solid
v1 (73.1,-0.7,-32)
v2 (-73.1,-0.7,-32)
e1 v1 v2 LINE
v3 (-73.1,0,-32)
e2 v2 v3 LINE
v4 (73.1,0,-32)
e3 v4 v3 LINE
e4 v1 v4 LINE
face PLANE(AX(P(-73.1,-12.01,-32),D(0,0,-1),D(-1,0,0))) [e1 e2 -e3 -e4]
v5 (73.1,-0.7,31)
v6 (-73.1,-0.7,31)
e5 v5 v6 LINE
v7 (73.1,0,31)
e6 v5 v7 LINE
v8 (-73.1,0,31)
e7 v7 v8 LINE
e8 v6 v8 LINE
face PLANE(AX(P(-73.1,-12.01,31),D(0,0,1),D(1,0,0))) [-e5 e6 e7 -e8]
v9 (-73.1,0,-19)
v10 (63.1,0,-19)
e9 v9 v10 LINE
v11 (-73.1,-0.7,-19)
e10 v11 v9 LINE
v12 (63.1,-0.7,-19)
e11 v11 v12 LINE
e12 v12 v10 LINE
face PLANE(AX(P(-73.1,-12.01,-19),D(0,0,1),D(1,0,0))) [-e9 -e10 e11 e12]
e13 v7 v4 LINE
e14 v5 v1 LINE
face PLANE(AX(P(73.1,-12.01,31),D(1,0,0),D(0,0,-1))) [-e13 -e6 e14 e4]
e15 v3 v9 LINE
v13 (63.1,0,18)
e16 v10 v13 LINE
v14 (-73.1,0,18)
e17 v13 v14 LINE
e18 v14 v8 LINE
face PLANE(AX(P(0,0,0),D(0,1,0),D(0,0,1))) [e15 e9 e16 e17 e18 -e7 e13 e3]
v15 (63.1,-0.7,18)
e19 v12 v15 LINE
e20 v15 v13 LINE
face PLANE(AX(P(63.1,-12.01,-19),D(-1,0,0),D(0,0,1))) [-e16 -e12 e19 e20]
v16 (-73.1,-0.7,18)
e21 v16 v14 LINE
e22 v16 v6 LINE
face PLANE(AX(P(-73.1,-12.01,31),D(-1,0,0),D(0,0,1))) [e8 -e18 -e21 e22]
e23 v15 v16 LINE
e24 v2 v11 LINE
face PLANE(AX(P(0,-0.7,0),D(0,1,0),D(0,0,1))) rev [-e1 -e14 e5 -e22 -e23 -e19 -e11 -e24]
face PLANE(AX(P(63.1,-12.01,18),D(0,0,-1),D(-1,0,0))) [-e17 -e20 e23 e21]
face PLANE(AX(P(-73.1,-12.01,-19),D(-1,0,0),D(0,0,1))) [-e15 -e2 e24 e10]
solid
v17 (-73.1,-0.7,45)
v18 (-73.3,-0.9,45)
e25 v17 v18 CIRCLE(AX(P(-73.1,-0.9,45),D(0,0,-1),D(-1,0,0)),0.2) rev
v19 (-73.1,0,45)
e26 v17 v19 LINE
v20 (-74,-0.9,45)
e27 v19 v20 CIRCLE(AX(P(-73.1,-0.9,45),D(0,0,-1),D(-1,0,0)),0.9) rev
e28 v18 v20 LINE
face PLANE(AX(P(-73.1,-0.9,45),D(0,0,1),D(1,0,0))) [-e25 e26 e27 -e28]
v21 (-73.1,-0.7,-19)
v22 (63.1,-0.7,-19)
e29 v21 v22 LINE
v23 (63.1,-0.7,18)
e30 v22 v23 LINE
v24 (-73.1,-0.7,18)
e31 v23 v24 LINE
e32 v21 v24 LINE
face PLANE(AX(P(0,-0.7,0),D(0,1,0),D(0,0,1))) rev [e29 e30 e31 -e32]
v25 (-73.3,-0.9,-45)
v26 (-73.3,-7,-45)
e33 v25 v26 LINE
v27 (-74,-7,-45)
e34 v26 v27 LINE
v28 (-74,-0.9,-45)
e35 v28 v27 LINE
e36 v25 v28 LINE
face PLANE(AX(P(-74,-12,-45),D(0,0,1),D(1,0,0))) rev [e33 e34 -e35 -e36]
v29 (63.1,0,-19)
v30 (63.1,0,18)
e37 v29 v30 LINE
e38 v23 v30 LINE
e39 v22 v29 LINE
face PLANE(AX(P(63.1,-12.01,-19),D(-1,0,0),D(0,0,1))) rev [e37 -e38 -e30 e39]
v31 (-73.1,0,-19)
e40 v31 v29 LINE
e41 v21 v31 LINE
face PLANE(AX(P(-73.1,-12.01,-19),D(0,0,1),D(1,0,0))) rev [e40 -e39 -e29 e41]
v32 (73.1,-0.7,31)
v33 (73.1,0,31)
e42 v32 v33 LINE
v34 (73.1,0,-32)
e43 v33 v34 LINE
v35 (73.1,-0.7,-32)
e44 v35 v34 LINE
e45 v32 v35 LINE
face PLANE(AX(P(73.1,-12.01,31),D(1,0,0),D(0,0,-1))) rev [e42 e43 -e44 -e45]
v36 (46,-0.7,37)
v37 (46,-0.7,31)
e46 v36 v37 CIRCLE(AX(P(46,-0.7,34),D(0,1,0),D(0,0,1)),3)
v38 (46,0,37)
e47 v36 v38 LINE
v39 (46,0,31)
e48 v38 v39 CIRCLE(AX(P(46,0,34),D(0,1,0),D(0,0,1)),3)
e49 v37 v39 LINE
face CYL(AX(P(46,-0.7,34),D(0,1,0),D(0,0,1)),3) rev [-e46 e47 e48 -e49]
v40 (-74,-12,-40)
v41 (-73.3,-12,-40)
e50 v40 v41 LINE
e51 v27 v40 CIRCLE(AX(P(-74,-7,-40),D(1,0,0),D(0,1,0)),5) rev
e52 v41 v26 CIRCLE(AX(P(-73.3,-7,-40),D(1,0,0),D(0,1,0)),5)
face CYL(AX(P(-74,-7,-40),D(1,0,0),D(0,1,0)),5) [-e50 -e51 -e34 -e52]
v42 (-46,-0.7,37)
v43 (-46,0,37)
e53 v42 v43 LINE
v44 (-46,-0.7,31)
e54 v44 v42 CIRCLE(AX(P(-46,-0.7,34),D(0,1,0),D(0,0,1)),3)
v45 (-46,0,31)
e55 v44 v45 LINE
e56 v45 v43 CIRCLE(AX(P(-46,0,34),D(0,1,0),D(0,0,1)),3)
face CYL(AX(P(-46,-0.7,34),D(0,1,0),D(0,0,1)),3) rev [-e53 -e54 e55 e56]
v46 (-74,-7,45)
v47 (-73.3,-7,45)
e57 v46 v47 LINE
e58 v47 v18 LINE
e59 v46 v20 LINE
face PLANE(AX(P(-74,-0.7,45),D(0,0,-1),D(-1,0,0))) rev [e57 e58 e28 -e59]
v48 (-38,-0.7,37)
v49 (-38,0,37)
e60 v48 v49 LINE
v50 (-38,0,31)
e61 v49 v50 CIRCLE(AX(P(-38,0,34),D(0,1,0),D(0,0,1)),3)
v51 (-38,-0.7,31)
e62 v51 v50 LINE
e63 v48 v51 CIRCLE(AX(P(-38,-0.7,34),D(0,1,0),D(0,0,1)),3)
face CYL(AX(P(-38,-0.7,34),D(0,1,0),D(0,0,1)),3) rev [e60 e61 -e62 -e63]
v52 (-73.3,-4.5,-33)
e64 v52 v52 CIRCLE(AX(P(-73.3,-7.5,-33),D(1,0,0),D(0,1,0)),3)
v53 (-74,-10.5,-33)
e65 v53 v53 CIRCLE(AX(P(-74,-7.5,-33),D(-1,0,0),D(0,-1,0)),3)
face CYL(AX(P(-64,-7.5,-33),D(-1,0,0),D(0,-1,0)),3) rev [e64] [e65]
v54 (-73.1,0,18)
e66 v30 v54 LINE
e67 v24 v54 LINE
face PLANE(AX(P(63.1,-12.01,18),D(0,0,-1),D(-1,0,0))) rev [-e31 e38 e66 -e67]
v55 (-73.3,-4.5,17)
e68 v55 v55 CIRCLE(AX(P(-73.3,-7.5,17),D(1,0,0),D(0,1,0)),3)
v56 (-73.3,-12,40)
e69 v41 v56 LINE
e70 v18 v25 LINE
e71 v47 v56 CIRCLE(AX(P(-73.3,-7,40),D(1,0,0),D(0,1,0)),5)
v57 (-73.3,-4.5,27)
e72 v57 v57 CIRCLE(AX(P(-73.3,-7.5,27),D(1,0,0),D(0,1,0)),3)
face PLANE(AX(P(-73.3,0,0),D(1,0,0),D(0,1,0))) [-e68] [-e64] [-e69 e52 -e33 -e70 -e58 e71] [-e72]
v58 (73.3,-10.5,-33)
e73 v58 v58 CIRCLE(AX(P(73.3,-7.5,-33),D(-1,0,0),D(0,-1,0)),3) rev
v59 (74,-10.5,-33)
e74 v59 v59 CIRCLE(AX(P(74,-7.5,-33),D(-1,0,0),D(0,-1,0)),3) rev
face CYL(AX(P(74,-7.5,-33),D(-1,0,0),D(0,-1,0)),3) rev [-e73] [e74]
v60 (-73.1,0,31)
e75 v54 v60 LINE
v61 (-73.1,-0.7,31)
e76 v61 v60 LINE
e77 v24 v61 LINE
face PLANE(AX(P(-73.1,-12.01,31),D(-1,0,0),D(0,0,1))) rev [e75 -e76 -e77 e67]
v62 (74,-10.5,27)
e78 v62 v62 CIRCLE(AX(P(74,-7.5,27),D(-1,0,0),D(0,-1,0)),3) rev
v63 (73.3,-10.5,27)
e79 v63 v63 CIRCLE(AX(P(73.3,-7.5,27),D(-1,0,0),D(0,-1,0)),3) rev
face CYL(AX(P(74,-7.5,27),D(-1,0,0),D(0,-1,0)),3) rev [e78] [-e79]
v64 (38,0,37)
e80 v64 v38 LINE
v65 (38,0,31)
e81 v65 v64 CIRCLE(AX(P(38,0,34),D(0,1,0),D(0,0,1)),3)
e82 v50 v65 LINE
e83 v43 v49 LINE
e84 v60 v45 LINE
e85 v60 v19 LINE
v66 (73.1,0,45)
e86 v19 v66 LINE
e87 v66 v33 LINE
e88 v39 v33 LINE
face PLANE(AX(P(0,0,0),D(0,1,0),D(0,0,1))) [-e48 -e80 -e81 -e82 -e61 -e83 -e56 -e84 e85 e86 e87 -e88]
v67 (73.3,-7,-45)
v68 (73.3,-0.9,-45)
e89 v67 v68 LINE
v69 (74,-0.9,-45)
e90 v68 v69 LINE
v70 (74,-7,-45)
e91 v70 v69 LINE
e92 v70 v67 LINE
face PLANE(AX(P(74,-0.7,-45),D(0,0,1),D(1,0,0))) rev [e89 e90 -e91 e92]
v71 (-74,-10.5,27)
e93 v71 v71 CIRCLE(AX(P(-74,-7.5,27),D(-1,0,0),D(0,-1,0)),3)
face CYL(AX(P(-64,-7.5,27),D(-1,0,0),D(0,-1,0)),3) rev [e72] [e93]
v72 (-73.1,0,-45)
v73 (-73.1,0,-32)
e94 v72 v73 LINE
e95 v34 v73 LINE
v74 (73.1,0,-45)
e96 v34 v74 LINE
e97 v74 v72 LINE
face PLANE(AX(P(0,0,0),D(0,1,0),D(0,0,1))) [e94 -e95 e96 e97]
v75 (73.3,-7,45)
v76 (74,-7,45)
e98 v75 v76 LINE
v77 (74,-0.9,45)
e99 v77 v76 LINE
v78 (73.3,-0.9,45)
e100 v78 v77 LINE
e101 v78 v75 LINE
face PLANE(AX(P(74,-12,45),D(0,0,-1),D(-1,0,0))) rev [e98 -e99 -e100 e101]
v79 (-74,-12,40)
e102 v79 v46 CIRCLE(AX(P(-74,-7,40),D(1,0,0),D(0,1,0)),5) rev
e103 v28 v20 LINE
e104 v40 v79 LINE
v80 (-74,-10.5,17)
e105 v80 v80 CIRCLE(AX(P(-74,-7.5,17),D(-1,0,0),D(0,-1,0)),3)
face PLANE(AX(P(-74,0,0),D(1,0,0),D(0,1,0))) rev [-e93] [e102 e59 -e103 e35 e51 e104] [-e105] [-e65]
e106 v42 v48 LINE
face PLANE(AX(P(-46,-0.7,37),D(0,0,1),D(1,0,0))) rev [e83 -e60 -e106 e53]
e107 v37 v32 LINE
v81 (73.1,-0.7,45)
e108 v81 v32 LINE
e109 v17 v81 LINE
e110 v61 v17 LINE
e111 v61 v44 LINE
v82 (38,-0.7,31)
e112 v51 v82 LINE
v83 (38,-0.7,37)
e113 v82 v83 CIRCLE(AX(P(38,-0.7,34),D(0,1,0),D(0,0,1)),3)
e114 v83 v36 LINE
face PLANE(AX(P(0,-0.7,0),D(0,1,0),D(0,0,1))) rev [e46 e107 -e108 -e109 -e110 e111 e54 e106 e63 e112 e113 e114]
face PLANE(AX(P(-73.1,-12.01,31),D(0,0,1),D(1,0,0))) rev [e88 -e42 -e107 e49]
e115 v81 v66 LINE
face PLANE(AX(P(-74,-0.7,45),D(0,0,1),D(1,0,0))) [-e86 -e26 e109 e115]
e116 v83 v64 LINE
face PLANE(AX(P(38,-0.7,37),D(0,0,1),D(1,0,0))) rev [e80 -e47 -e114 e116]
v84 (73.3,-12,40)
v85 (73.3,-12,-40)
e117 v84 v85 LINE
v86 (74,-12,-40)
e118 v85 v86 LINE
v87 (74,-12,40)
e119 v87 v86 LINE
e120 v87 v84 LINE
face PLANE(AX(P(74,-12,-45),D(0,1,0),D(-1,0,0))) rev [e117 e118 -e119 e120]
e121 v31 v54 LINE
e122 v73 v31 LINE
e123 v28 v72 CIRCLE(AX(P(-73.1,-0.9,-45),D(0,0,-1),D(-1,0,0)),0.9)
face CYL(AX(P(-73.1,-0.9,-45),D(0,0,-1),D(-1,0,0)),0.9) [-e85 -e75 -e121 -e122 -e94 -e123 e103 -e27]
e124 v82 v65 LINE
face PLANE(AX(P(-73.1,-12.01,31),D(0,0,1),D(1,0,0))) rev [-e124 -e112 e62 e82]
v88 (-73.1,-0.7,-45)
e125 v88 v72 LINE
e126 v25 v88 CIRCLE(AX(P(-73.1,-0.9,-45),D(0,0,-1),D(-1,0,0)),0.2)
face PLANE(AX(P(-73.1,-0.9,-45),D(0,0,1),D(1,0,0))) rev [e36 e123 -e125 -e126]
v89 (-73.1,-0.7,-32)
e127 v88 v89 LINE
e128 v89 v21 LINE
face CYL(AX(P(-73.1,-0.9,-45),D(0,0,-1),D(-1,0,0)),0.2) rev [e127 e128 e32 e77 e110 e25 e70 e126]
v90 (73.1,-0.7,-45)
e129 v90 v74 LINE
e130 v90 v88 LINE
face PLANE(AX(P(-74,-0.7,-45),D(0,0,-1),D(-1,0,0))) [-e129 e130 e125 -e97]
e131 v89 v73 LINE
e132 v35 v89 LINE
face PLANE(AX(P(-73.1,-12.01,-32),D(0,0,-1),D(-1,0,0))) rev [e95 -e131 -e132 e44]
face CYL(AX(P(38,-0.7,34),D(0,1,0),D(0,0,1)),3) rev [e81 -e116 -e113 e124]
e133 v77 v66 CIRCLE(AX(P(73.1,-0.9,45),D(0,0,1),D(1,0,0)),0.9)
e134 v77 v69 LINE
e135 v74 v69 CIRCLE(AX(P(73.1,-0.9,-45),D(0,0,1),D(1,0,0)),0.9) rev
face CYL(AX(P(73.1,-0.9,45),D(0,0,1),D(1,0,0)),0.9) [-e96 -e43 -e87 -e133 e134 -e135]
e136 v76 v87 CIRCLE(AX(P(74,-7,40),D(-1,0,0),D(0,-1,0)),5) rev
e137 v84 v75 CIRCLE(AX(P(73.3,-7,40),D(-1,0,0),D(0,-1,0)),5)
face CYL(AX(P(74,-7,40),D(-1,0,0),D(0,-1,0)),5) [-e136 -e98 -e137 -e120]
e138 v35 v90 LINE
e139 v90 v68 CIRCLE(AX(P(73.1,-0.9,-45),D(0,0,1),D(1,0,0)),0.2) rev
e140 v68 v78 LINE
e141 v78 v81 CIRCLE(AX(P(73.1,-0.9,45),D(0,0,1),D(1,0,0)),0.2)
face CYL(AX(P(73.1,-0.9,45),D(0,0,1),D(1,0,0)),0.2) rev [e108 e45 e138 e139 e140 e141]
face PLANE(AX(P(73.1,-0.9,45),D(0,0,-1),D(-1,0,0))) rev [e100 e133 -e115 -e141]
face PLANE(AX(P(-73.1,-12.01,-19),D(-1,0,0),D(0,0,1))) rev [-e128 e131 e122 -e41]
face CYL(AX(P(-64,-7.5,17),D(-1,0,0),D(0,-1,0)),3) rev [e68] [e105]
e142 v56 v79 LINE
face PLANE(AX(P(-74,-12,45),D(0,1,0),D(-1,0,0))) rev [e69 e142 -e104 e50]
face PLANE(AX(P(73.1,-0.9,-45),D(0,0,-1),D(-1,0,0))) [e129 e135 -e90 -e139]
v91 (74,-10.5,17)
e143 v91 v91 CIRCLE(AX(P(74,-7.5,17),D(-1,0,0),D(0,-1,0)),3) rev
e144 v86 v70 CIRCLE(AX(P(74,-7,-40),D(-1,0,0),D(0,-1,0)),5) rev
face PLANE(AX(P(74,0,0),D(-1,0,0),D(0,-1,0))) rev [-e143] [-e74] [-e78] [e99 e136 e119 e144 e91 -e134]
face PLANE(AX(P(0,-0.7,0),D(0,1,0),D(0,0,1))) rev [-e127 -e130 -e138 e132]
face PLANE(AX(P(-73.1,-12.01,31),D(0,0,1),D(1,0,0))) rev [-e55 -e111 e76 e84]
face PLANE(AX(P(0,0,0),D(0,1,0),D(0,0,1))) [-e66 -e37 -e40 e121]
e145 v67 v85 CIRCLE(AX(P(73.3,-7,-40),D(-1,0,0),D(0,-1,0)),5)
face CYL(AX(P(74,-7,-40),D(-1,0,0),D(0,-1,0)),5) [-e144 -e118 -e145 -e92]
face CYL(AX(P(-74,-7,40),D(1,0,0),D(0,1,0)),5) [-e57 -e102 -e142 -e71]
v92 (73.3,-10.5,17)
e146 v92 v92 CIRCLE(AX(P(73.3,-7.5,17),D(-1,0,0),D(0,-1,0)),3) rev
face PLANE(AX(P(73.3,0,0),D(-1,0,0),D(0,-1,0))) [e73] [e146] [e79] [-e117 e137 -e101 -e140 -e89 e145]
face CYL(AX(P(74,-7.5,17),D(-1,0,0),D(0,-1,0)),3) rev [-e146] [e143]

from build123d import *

# Parameters (mm, degrees)
SKETCH_1_W                         = 148
SKETCH_1_H                         = 90
SM_BASE_FLANGE_1_DEPTH             = 0.7
SM_EDGE_FLANGE_1_STRIP_W           = 3.2
SM_EDGE_FLANGE_1_STRIP_H           = 0.7
SM_EDGE_FLANGE_1_STRIP_CUT_DEPTH   = 90
SM_EDGE_FLANGE_1_STRIP_2_W         = 3.2
SM_EDGE_FLANGE_1_STRIP_2_H         = 0.7
SM_EDGE_FLANGE_1_STRIP_CUT_2_DEPTH = 90
SM_EDGE_FLANGE_1_DEPTH             = 90
SM_EDGE_FLANGE_1_PROFILE_W         = 90
SM_EDGE_FLANGE_1_PROFILE_H         = 11.1
SM_EDGE_FLANGE_1_PROFILE_R         = 3
SM_EDGE_FLANGE_1_FLAT_DEPTH        = 0.7
SM_EDGE_FLANGE_1_BEND_DEPTH        = 90
FILLET_2_R                         = 5
CUT_EXTRUDE_START                  = -10
SKETCH_15_R                        = 3
CUT_EXTRUDE_1_DEPTH                = 10
SPLIT_BODIES_1_SURFACE_1_BACK      = 174.632
SPLIT_BODIES_1_SURFACE_1_DEPTH     = 349.264
SPLIT_BODIES_1_SURFACE_2_BACK      = 174.632
SPLIT_BODIES_1_SURFACE_2_DEPTH     = 349.264


# Sheet-metal steps are written as plain solids
with BuildPart() as part:
    # Sketch 1 → 基体-法兰1 (new body)
    with BuildSketch(Plane(origin=(0, 0, 0), x_dir=(1, 0, 0), z_dir=(0, 1, 0))):
        Rectangle(SKETCH_1_W, SKETCH_1_H)
        with BuildLine():
            Line((-46, -31), (-38, -31))
            ThreePointArc((-38, -31), (-35, -34), (-38, -37))
            Line((-38, -37), (-46, -37))
            ThreePointArc((-46, -37), (-49, -34), (-46, -31))
        make_face(mode=Mode.SUBTRACT)
        with BuildLine():
            Line((38, -31), (46, -31))
            ThreePointArc((46, -31), (49, -34), (46, -37))
            Line((46, -37), (38, -37))
            ThreePointArc((38, -37), (35, -34), (38, -31))
        make_face(mode=Mode.SUBTRACT)
    extrude(amount=-SM_BASE_FLANGE_1_DEPTH)

    # 边线-法兰1 strip (across the edge) → 边线-法兰1 strip cut (cut)
    with BuildSketch(Plane(origin=(74, -0.7, -45), x_dir=(-1, 0, 0), z_dir=(0, 0, 1))):
        with Locations((-0.7, -0.35)):
            Rectangle(SM_EDGE_FLANGE_1_STRIP_W, SM_EDGE_FLANGE_1_STRIP_H)
    extrude(amount=SM_EDGE_FLANGE_1_STRIP_CUT_DEPTH, mode=Mode.SUBTRACT)

    # 边线-法兰1 strip 2 (across the edge) → 边线-法兰1 strip cut 2 (cut)
    with BuildSketch(Plane(origin=(-74, -0.7, 45), x_dir=(1, 0, 0), z_dir=(0, 0, -1))):
        with Locations((-0.7, -0.35)):
            Rectangle(SM_EDGE_FLANGE_1_STRIP_2_W, SM_EDGE_FLANGE_1_STRIP_2_H)
    extrude(amount=SM_EDGE_FLANGE_1_STRIP_CUT_2_DEPTH, mode=Mode.SUBTRACT)

    # 边线-法兰1 bend section (across the edge) → 边线-法兰1 (add)
    with BuildSketch(Plane(origin=(74, -0.7, -45), x_dir=(-1, 0, 0), z_dir=(0, 0, 1))):
        with BuildLine():
            Line((0, 0.2), (0.7, 0.2))
            ThreePointArc((0.7, 0.2), (0.758578644, 0.058578644), (0.9, 0))
            Line((0.9, 0), (0.9, -0.7))
            ThreePointArc((0.9, -0.7), (0.263603897, -0.436396103), (0, 0.2))
        make_face()
    extrude(amount=SM_EDGE_FLANGE_1_DEPTH)

    # 边线-法兰1 profile (on flange) → 边线-法兰1 flat (add)
    with BuildSketch(Plane(origin=(74, -0.7, 0), x_dir=(0, 0, 1), z_dir=(1, 0, 0))):
        with Locations((0, 5.75)):
            Rectangle(SM_EDGE_FLANGE_1_PROFILE_W, SM_EDGE_FLANGE_1_PROFILE_H)
        with Locations((17, 6.8)):
            Circle(SM_EDGE_FLANGE_1_PROFILE_R, mode=Mode.SUBTRACT)
        with Locations((27, 6.8)):
            Circle(SM_EDGE_FLANGE_1_PROFILE_R, mode=Mode.SUBTRACT)
        with Locations((-33, 6.8)):
            Circle(SM_EDGE_FLANGE_1_PROFILE_R, mode=Mode.SUBTRACT)
    extrude(amount=-SM_EDGE_FLANGE_1_FLAT_DEPTH)

    # 边线-法兰1 section (across the edge) → 边线-法兰1 bend (add)
    with BuildSketch(Plane(origin=(-74, -0.7, 45), x_dir=(1, 0, 0), z_dir=(0, 0, -1))):
        with BuildLine():
            Line((0, 0.2), (0, 11.3))
            Line((0, 11.3), (0.7, 11.3))
            Line((0.7, 11.3), (0.7, 0.2))
            ThreePointArc((0.7, 0.2), (0.758578644, 0.058578644), (0.9, 0))
            Line((0.9, 0), (0.9, -0.7))
            ThreePointArc((0.9, -0.7), (0.263603897, -0.436396103), (0, 0.2))
        make_face()
    extrude(amount=SM_EDGE_FLANGE_1_BEND_DEPTH)

    # 圆角2
    fillet_2_edges = [part.edges().sort_by_distance(p)[0] for p in [
        (-73.65, -12, 45),
        (-73.65, -12, -45),
        (73.65, -12, -45),
        (73.65, -12, 45),
    ]]
    fillet(fillet_2_edges, radius=FILLET_2_R)

    # 草图15 → 切除-拉伸1 (cut)
    with BuildSketch(Plane.ZY.offset(74).offset(CUT_EXTRUDE_START)):
        with Locations(Location((-33, -7.5, 0), (0, 0, 270))):
            Circle(SKETCH_15_R)
        with Locations(Location((17, -7.5, 0), (0, 0, 270))):
            Circle(SKETCH_15_R)
        with Locations(Location((27, -7.5, 0), (0, 0, 270))):
            Circle(SKETCH_15_R)
    extrude(amount=CUT_EXTRUDE_1_DEPTH, mode=Mode.SUBTRACT)


with BuildPart() as body_2:
    # Split Bodies 1: the piece behind the surface
    add(part.part)
    # Split Bodies 1 surface: a surface, the sketch's curves swept straight by 349.264 mm
    with BuildLine(Plane(origin=(0, 0, 0), x_dir=(1, 0, 0), z_dir=(0, 1, 0)).offset(-SPLIT_BODIES_1_SURFACE_1_BACK), mode=Mode.PRIVATE) as split_bodies_1_surface_1_path:
        Line((-73.1, 32), (73.1, 32))
        Line((73.1, 32), (73.1, -31))
        Line((73.1, -31), (-73.1, -31))
        Line((-73.1, -31), (-73.1, -18))
        Line((-73.1, -18), (63.1, -18))
        Line((63.1, -18), (63.1, 19))
        Line((63.1, 19), (-73.1, 19))
        Line((-73.1, 19), (-73.1, 32))
    split_bodies_1_surface_1 = Shell.extrude(split_bodies_1_surface_1_path.wire(), (0 * SPLIT_BODIES_1_SURFACE_1_DEPTH, 1 * SPLIT_BODIES_1_SURFACE_1_DEPTH, 0 * SPLIT_BODIES_1_SURFACE_1_DEPTH))
    split(bisect_by=split_bodies_1_surface_1, keep=Keep.BOTTOM)


with BuildPart() as part_1:
    add(part.part)

    # Split Bodies 1: split by a surface, the side it looks to stays
    # Split Bodies 1 surface: a surface, the sketch's curves swept straight by 349.264 mm
    with BuildLine(Plane(origin=(0, 0, 0), x_dir=(1, 0, 0), z_dir=(0, 1, 0)).offset(-SPLIT_BODIES_1_SURFACE_2_BACK), mode=Mode.PRIVATE) as split_bodies_1_surface_2_path:
        Line((-73.1, 32), (73.1, 32))
        Line((73.1, 32), (73.1, -31))
        Line((73.1, -31), (-73.1, -31))
        Line((-73.1, -31), (-73.1, -18))
        Line((-73.1, -18), (63.1, -18))
        Line((63.1, -18), (63.1, 19))
        Line((63.1, 19), (-73.1, 19))
        Line((-73.1, 19), (-73.1, 32))
    split_bodies_1_surface_2 = Shell.extrude(split_bodies_1_surface_2_path.wire(), (0 * SPLIT_BODIES_1_SURFACE_2_DEPTH, 1 * SPLIT_BODIES_1_SURFACE_2_DEPTH, 0 * SPLIT_BODIES_1_SURFACE_2_DEPTH))
    split(bisect_by=split_bodies_1_surface_2, keep=Keep.TOP)


solid = Compound([body_2.part, part_1.part])
